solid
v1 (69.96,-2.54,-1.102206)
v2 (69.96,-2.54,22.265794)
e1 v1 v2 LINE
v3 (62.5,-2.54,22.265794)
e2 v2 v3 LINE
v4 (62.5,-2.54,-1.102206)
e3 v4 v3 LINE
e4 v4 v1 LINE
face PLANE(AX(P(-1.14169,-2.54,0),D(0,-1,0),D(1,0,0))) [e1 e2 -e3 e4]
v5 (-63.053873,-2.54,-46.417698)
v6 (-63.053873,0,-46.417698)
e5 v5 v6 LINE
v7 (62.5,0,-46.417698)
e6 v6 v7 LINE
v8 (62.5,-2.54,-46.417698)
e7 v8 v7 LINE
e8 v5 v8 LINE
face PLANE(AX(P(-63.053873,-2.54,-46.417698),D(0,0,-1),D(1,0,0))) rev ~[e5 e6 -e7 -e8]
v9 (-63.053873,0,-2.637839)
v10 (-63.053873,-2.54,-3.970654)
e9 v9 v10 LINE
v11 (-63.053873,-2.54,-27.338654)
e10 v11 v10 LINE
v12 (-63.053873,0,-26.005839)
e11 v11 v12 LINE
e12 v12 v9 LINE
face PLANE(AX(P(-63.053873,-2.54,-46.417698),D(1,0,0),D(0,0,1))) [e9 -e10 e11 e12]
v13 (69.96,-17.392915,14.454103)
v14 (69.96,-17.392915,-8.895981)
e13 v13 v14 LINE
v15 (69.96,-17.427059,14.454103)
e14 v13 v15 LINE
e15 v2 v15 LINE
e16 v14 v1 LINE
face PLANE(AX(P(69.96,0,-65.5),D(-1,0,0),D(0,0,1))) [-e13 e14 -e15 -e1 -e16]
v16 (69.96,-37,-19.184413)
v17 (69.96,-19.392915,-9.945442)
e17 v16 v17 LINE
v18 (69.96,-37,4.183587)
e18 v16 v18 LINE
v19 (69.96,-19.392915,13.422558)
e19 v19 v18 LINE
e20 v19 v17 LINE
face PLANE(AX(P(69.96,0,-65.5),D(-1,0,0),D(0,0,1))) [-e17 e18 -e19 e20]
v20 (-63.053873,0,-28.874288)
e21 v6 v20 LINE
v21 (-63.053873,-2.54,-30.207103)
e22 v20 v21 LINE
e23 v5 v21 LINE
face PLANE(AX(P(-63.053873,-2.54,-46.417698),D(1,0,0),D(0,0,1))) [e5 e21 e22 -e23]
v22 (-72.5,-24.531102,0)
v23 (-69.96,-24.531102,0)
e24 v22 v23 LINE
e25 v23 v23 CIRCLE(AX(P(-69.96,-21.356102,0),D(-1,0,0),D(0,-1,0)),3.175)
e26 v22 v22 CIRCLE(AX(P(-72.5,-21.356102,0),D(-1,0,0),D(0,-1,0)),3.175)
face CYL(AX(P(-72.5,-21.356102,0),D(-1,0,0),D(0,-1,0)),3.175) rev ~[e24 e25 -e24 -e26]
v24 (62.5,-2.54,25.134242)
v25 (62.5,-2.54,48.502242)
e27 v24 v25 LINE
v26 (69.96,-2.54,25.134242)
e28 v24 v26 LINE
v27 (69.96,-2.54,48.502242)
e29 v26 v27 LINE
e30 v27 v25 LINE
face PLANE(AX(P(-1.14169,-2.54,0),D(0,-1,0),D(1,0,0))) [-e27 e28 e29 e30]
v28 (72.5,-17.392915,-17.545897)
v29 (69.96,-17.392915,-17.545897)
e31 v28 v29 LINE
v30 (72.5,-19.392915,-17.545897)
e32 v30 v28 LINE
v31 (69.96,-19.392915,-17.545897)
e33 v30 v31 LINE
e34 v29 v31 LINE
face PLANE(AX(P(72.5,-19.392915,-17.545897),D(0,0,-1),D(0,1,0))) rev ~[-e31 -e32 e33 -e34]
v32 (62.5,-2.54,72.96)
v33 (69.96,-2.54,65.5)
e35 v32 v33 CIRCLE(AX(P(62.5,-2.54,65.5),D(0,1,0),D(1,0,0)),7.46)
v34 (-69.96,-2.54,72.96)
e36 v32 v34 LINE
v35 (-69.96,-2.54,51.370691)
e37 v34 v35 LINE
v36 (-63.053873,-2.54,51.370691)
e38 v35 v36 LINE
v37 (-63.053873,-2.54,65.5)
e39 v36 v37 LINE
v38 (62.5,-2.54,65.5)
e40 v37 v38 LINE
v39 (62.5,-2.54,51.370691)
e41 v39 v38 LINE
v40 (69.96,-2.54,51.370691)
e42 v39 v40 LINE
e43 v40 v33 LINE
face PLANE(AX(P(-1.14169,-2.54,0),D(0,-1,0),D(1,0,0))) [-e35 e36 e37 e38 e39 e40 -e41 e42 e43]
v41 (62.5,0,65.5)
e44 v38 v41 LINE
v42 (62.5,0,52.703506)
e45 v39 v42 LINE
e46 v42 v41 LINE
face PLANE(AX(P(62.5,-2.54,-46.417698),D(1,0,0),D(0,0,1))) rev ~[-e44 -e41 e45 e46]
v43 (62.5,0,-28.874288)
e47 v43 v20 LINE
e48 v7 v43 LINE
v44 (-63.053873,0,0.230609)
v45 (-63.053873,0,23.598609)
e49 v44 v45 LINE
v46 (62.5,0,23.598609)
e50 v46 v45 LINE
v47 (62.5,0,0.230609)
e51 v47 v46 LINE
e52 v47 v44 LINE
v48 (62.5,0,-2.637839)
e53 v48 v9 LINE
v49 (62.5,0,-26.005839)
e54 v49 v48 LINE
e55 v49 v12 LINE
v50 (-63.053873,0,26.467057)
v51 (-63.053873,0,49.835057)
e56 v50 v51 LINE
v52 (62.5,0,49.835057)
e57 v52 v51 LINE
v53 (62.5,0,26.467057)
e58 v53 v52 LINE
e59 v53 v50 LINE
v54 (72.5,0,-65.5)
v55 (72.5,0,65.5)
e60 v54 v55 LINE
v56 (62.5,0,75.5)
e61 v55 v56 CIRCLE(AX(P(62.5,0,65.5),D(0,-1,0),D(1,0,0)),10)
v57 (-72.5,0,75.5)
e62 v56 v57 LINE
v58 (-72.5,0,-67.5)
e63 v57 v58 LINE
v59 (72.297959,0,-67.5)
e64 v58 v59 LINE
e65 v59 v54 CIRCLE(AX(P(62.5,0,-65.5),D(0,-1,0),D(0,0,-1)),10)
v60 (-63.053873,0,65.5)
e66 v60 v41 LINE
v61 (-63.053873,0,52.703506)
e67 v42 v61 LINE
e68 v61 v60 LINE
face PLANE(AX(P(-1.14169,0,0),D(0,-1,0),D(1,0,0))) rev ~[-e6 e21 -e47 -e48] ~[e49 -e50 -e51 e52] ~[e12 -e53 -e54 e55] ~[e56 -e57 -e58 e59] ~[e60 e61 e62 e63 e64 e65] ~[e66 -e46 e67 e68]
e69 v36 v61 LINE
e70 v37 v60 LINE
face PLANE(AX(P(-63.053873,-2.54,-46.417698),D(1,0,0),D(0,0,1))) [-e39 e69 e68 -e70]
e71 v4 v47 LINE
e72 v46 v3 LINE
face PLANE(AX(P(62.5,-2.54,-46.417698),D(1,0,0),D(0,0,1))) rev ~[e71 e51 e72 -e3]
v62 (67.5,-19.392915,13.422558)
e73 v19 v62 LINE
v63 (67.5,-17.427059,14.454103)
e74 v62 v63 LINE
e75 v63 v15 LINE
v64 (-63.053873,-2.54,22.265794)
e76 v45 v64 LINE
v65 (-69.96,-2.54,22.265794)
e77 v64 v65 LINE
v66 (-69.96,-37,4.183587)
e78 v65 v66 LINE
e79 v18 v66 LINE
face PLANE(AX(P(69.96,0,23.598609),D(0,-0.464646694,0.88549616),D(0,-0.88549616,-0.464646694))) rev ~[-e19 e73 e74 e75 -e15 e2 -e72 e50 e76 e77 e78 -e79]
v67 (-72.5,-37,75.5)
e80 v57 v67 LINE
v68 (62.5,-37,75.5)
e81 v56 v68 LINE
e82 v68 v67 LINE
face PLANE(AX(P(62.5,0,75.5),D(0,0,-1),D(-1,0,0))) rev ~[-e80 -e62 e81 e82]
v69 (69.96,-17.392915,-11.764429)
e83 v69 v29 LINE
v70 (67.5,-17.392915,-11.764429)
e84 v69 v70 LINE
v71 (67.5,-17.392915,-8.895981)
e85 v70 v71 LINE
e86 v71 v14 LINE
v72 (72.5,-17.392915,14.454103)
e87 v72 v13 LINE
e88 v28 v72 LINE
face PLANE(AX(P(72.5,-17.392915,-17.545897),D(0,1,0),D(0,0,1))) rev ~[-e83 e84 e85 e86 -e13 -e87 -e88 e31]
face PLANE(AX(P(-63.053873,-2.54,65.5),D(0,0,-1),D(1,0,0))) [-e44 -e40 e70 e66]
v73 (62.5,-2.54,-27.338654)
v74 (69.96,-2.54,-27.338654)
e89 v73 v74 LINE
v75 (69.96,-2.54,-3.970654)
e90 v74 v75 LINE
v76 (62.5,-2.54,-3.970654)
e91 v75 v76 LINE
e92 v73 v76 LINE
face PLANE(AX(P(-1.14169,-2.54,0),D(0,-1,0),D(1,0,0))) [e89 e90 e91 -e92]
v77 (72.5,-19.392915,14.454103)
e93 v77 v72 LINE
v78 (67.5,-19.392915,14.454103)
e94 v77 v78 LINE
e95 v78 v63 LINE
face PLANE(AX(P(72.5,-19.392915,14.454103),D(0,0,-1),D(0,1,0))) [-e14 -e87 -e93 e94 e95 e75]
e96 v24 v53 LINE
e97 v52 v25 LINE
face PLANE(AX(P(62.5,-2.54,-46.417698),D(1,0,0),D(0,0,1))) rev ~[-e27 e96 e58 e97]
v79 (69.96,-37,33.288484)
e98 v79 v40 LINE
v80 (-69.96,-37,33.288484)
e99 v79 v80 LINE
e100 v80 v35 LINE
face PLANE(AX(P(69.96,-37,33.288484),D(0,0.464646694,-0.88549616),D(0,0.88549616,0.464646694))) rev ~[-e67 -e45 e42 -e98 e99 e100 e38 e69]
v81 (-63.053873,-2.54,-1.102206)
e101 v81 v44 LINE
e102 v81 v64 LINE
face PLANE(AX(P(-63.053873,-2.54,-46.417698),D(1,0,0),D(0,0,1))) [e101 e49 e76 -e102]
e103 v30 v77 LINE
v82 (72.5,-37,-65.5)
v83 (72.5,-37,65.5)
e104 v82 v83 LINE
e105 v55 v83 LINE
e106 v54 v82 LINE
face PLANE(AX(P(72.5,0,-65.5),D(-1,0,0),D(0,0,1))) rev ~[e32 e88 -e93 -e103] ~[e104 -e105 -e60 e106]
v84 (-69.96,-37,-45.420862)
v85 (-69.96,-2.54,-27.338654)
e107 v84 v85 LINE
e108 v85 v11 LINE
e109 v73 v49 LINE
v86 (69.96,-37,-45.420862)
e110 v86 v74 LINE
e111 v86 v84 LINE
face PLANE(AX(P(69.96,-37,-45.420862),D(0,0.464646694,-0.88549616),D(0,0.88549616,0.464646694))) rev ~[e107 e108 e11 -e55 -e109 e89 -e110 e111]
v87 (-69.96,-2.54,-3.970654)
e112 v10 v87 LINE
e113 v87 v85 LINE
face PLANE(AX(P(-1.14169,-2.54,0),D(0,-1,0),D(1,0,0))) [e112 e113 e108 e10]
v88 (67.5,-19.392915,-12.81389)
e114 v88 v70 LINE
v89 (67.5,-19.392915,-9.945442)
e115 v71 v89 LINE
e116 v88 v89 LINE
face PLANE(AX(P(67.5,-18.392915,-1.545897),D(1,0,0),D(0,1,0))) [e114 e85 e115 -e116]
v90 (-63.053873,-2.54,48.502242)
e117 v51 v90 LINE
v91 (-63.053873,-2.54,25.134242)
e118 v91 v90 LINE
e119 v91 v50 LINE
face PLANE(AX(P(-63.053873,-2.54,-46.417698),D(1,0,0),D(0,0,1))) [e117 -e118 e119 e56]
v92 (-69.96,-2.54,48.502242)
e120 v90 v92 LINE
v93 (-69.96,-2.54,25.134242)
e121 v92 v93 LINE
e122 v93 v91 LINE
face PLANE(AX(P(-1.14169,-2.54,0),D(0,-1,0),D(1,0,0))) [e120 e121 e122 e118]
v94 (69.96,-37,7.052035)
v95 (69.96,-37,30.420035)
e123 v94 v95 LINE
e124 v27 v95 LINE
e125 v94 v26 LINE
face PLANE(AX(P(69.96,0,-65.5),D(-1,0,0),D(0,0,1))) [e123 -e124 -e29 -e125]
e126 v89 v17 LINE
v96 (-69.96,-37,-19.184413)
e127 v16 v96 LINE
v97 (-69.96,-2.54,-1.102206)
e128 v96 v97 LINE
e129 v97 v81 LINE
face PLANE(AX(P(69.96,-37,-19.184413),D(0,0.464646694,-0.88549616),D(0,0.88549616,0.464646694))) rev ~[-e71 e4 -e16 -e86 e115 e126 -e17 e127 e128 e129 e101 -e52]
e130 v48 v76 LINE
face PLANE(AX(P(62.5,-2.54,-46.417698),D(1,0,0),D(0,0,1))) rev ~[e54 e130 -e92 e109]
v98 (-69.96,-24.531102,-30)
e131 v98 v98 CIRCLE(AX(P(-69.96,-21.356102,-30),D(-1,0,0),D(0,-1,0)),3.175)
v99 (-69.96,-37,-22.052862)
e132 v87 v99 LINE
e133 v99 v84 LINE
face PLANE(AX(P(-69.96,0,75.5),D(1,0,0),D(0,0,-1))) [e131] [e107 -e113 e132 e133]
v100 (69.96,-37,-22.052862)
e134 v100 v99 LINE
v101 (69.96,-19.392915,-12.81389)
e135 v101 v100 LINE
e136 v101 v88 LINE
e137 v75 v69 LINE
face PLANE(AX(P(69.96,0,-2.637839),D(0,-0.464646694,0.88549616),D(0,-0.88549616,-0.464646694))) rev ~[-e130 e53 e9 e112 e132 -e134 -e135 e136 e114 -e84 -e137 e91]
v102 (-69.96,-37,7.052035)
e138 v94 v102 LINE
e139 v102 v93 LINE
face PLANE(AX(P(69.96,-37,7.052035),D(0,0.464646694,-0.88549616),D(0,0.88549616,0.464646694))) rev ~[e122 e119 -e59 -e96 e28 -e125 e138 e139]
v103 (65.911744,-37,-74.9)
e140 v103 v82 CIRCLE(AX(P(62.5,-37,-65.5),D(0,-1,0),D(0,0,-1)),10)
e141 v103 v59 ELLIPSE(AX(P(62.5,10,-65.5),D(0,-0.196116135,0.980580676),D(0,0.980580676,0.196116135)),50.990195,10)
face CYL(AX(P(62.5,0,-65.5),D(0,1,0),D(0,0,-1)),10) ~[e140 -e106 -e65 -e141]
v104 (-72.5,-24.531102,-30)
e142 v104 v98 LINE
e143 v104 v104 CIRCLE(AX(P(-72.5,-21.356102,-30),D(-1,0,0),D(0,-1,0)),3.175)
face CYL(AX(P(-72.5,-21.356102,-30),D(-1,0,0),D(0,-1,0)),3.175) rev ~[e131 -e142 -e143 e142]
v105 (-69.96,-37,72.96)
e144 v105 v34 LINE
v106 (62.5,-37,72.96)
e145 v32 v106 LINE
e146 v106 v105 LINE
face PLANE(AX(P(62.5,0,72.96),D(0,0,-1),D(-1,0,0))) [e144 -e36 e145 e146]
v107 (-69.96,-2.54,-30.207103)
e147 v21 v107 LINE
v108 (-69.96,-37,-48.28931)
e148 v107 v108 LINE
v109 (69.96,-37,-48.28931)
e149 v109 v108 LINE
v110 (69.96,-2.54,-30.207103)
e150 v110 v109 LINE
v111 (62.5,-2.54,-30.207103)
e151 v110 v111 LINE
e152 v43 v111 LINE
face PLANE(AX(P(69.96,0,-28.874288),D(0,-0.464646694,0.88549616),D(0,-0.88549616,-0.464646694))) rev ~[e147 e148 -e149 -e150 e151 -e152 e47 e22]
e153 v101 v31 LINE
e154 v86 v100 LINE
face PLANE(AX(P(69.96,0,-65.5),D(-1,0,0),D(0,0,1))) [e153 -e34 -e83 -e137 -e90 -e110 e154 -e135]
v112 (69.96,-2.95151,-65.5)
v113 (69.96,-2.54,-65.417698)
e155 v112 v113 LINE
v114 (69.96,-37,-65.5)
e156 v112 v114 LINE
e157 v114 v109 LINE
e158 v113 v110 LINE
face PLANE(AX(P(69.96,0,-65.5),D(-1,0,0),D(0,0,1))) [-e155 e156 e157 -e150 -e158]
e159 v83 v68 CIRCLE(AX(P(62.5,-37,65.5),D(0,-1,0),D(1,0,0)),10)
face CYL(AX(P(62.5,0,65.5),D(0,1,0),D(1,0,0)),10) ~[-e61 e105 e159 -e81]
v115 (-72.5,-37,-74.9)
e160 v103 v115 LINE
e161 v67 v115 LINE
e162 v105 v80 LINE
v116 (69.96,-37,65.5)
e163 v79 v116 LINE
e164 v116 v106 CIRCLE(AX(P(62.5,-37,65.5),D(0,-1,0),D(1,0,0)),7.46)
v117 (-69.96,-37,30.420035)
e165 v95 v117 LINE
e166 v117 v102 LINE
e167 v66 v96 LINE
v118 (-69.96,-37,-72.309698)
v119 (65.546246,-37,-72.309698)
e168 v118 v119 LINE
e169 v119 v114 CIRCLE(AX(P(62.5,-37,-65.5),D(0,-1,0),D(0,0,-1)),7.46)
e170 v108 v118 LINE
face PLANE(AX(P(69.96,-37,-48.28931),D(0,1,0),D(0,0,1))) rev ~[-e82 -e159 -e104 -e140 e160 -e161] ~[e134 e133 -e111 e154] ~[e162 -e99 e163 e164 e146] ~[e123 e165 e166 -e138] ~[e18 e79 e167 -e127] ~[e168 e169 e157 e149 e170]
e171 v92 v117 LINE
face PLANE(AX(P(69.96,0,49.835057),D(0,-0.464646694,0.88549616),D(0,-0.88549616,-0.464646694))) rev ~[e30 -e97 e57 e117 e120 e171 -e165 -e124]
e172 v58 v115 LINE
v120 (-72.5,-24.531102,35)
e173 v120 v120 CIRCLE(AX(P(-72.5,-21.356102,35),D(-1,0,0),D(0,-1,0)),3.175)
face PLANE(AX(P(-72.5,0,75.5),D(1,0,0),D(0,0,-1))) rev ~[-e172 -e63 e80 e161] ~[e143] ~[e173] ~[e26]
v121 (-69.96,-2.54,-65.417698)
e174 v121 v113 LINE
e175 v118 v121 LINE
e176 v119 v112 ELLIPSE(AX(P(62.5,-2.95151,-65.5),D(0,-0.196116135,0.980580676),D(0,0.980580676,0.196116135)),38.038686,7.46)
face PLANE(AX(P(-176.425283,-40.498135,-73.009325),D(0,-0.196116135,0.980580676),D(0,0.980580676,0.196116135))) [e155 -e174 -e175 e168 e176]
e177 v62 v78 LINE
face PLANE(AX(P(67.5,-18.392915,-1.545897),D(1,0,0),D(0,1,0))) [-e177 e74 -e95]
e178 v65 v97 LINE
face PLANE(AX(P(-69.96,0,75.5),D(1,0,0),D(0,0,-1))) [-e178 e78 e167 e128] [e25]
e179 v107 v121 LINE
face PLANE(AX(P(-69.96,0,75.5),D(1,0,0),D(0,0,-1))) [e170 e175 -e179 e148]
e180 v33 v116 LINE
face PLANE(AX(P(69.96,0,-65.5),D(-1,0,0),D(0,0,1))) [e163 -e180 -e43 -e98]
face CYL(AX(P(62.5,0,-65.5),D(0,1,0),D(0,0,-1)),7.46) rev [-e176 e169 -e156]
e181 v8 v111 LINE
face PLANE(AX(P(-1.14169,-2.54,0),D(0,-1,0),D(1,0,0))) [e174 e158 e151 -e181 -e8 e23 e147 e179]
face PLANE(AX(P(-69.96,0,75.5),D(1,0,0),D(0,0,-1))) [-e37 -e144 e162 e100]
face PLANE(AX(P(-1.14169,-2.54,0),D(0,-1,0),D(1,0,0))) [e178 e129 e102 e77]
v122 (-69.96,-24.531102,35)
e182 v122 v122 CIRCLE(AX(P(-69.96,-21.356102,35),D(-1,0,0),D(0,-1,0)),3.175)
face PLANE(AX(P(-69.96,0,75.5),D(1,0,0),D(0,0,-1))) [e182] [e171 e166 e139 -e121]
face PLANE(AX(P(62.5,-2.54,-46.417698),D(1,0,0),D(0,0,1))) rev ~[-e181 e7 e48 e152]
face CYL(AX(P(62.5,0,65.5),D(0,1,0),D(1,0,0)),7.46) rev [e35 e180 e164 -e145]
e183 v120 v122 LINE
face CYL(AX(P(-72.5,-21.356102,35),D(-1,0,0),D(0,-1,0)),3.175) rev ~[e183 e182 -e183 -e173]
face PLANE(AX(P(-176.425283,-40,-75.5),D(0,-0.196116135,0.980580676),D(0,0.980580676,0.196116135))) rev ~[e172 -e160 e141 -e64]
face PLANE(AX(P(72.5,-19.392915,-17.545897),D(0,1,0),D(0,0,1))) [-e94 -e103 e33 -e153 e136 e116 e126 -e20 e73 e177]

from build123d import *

# Parameters (mm, degrees)
F1_DEPTH    = 37
F2_T1_DEPTH = 342.8505669038
F3_T        = -2.54
F4_W        = 125.55387271
F4_H        = 111.9176980871
F5_DEPTH    = 25.4
F6_R        = 3.175
F7_DEPTH    = 19.05
F9_DEPTH    = 142.24
F10_W       = 2
F10_H       = 32
F11_DEPTH   = 5


# Not quite as in the source:
# - a fillet or chamfer that OpenCascade refuses, or shapes differently, is made with other operations: its cross-section is extruded or revolved along the edge and cut away or added


with BuildPart() as f1:
    # F0 (on Front) → F1 (new body)
    with BuildSketch(Plane.XZ):
        with BuildLine():
            Line((62.5, 75.5), (-72.5, 75.5))
            Line((-72.5, 75.5), (-72.5, -75.5))
            Line((-72.5, -75.5), (62.5, -75.5))
            ThreePointArc((62.5, -75.5), (69.5710678119, -72.5710678119), (72.5, -65.5))
            Line((72.5, -65.5), (72.5, 65.5))
            ThreePointArc((72.5, 65.5), (69.5710678119, 72.5710678119), (62.5, 75.5))
        make_face()
    extrude(amount=F1_DEPTH)

    # F2: chamfer of 40 x 8 on 1 edges, made by hand

    # F2_s2 → F2_t1 (cut)
    with BuildSketch(Plane.YZ.offset(-176.4252834519)):
        Polygon((-40, -75.5), (0, -67.5), (0, -75.5), align=None)
    extrude(amount=F2_T1_DEPTH, mode=Mode.SUBTRACT)

    # F3
    f3_openings = [f1.faces().sort_by_distance(p)[0] for p in [
        (-0.123954, -37, 0.284541),
    ]]
    offset(amount=F3_T, openings=f3_openings)

    # F4 (on face) → F5 (cut)
    with BuildSketch(Plane.XZ.offset(2.54)):
        with Locations((-0.276936355, 9.5411509565)):
            Rectangle(F4_W, F4_H)
    extrude(amount=-F5_DEPTH, mode=Mode.SUBTRACT)

    # F6 (on face) → F7 (cut)
    with BuildSketch(Plane(origin=(-72.5, 0, 0), x_dir=(0, -1, 0), z_dir=(-1, 0, 0))):
        with Locations((21.3561020792, 0)):
            Circle(F6_R)
        with Locations((21.3561020792, 35)):
            Circle(F6_R)
        with Locations((21.3561020792, -30)):
            Circle(F6_R)
    extrude(amount=-F7_DEPTH, mode=Mode.SUBTRACT)

    # F8 (on face) → F9 (join)
    with BuildSketch(Plane(origin=(69.96, 0, 0), x_dir=(0, -1, 0), z_dir=(-1, 0, 0))):
        Polygon((0, -28.8742875891), (37, -48.2893098931), (37, -45.4208615419), (0, -26.005839238), align=None)
        Polygon((0, -2.637839238), (37, -22.0528615419), (37, -19.1844131908), (0, 0.2306091132), align=None)
        Polygon((0, 23.5986091132), (37, 4.1835868092), (37, 7.0520351604), (0, 26.4670574643), align=None)
        Polygon((0, 49.8350574643), (37, 30.4200351604), (37, 33.2884835115), (0, 52.7035058155), align=None)
    extrude(amount=F9_DEPTH)

    # F10 (on face) → F11 (cut)
    with BuildSketch(Plane.YZ.offset(72.5)):
        with Locations((-18.3929149747, -1.5458973408)):
            Rectangle(F10_W, F10_H)
    extrude(amount=-F11_DEPTH, mode=Mode.SUBTRACT)


solid = f1.part
